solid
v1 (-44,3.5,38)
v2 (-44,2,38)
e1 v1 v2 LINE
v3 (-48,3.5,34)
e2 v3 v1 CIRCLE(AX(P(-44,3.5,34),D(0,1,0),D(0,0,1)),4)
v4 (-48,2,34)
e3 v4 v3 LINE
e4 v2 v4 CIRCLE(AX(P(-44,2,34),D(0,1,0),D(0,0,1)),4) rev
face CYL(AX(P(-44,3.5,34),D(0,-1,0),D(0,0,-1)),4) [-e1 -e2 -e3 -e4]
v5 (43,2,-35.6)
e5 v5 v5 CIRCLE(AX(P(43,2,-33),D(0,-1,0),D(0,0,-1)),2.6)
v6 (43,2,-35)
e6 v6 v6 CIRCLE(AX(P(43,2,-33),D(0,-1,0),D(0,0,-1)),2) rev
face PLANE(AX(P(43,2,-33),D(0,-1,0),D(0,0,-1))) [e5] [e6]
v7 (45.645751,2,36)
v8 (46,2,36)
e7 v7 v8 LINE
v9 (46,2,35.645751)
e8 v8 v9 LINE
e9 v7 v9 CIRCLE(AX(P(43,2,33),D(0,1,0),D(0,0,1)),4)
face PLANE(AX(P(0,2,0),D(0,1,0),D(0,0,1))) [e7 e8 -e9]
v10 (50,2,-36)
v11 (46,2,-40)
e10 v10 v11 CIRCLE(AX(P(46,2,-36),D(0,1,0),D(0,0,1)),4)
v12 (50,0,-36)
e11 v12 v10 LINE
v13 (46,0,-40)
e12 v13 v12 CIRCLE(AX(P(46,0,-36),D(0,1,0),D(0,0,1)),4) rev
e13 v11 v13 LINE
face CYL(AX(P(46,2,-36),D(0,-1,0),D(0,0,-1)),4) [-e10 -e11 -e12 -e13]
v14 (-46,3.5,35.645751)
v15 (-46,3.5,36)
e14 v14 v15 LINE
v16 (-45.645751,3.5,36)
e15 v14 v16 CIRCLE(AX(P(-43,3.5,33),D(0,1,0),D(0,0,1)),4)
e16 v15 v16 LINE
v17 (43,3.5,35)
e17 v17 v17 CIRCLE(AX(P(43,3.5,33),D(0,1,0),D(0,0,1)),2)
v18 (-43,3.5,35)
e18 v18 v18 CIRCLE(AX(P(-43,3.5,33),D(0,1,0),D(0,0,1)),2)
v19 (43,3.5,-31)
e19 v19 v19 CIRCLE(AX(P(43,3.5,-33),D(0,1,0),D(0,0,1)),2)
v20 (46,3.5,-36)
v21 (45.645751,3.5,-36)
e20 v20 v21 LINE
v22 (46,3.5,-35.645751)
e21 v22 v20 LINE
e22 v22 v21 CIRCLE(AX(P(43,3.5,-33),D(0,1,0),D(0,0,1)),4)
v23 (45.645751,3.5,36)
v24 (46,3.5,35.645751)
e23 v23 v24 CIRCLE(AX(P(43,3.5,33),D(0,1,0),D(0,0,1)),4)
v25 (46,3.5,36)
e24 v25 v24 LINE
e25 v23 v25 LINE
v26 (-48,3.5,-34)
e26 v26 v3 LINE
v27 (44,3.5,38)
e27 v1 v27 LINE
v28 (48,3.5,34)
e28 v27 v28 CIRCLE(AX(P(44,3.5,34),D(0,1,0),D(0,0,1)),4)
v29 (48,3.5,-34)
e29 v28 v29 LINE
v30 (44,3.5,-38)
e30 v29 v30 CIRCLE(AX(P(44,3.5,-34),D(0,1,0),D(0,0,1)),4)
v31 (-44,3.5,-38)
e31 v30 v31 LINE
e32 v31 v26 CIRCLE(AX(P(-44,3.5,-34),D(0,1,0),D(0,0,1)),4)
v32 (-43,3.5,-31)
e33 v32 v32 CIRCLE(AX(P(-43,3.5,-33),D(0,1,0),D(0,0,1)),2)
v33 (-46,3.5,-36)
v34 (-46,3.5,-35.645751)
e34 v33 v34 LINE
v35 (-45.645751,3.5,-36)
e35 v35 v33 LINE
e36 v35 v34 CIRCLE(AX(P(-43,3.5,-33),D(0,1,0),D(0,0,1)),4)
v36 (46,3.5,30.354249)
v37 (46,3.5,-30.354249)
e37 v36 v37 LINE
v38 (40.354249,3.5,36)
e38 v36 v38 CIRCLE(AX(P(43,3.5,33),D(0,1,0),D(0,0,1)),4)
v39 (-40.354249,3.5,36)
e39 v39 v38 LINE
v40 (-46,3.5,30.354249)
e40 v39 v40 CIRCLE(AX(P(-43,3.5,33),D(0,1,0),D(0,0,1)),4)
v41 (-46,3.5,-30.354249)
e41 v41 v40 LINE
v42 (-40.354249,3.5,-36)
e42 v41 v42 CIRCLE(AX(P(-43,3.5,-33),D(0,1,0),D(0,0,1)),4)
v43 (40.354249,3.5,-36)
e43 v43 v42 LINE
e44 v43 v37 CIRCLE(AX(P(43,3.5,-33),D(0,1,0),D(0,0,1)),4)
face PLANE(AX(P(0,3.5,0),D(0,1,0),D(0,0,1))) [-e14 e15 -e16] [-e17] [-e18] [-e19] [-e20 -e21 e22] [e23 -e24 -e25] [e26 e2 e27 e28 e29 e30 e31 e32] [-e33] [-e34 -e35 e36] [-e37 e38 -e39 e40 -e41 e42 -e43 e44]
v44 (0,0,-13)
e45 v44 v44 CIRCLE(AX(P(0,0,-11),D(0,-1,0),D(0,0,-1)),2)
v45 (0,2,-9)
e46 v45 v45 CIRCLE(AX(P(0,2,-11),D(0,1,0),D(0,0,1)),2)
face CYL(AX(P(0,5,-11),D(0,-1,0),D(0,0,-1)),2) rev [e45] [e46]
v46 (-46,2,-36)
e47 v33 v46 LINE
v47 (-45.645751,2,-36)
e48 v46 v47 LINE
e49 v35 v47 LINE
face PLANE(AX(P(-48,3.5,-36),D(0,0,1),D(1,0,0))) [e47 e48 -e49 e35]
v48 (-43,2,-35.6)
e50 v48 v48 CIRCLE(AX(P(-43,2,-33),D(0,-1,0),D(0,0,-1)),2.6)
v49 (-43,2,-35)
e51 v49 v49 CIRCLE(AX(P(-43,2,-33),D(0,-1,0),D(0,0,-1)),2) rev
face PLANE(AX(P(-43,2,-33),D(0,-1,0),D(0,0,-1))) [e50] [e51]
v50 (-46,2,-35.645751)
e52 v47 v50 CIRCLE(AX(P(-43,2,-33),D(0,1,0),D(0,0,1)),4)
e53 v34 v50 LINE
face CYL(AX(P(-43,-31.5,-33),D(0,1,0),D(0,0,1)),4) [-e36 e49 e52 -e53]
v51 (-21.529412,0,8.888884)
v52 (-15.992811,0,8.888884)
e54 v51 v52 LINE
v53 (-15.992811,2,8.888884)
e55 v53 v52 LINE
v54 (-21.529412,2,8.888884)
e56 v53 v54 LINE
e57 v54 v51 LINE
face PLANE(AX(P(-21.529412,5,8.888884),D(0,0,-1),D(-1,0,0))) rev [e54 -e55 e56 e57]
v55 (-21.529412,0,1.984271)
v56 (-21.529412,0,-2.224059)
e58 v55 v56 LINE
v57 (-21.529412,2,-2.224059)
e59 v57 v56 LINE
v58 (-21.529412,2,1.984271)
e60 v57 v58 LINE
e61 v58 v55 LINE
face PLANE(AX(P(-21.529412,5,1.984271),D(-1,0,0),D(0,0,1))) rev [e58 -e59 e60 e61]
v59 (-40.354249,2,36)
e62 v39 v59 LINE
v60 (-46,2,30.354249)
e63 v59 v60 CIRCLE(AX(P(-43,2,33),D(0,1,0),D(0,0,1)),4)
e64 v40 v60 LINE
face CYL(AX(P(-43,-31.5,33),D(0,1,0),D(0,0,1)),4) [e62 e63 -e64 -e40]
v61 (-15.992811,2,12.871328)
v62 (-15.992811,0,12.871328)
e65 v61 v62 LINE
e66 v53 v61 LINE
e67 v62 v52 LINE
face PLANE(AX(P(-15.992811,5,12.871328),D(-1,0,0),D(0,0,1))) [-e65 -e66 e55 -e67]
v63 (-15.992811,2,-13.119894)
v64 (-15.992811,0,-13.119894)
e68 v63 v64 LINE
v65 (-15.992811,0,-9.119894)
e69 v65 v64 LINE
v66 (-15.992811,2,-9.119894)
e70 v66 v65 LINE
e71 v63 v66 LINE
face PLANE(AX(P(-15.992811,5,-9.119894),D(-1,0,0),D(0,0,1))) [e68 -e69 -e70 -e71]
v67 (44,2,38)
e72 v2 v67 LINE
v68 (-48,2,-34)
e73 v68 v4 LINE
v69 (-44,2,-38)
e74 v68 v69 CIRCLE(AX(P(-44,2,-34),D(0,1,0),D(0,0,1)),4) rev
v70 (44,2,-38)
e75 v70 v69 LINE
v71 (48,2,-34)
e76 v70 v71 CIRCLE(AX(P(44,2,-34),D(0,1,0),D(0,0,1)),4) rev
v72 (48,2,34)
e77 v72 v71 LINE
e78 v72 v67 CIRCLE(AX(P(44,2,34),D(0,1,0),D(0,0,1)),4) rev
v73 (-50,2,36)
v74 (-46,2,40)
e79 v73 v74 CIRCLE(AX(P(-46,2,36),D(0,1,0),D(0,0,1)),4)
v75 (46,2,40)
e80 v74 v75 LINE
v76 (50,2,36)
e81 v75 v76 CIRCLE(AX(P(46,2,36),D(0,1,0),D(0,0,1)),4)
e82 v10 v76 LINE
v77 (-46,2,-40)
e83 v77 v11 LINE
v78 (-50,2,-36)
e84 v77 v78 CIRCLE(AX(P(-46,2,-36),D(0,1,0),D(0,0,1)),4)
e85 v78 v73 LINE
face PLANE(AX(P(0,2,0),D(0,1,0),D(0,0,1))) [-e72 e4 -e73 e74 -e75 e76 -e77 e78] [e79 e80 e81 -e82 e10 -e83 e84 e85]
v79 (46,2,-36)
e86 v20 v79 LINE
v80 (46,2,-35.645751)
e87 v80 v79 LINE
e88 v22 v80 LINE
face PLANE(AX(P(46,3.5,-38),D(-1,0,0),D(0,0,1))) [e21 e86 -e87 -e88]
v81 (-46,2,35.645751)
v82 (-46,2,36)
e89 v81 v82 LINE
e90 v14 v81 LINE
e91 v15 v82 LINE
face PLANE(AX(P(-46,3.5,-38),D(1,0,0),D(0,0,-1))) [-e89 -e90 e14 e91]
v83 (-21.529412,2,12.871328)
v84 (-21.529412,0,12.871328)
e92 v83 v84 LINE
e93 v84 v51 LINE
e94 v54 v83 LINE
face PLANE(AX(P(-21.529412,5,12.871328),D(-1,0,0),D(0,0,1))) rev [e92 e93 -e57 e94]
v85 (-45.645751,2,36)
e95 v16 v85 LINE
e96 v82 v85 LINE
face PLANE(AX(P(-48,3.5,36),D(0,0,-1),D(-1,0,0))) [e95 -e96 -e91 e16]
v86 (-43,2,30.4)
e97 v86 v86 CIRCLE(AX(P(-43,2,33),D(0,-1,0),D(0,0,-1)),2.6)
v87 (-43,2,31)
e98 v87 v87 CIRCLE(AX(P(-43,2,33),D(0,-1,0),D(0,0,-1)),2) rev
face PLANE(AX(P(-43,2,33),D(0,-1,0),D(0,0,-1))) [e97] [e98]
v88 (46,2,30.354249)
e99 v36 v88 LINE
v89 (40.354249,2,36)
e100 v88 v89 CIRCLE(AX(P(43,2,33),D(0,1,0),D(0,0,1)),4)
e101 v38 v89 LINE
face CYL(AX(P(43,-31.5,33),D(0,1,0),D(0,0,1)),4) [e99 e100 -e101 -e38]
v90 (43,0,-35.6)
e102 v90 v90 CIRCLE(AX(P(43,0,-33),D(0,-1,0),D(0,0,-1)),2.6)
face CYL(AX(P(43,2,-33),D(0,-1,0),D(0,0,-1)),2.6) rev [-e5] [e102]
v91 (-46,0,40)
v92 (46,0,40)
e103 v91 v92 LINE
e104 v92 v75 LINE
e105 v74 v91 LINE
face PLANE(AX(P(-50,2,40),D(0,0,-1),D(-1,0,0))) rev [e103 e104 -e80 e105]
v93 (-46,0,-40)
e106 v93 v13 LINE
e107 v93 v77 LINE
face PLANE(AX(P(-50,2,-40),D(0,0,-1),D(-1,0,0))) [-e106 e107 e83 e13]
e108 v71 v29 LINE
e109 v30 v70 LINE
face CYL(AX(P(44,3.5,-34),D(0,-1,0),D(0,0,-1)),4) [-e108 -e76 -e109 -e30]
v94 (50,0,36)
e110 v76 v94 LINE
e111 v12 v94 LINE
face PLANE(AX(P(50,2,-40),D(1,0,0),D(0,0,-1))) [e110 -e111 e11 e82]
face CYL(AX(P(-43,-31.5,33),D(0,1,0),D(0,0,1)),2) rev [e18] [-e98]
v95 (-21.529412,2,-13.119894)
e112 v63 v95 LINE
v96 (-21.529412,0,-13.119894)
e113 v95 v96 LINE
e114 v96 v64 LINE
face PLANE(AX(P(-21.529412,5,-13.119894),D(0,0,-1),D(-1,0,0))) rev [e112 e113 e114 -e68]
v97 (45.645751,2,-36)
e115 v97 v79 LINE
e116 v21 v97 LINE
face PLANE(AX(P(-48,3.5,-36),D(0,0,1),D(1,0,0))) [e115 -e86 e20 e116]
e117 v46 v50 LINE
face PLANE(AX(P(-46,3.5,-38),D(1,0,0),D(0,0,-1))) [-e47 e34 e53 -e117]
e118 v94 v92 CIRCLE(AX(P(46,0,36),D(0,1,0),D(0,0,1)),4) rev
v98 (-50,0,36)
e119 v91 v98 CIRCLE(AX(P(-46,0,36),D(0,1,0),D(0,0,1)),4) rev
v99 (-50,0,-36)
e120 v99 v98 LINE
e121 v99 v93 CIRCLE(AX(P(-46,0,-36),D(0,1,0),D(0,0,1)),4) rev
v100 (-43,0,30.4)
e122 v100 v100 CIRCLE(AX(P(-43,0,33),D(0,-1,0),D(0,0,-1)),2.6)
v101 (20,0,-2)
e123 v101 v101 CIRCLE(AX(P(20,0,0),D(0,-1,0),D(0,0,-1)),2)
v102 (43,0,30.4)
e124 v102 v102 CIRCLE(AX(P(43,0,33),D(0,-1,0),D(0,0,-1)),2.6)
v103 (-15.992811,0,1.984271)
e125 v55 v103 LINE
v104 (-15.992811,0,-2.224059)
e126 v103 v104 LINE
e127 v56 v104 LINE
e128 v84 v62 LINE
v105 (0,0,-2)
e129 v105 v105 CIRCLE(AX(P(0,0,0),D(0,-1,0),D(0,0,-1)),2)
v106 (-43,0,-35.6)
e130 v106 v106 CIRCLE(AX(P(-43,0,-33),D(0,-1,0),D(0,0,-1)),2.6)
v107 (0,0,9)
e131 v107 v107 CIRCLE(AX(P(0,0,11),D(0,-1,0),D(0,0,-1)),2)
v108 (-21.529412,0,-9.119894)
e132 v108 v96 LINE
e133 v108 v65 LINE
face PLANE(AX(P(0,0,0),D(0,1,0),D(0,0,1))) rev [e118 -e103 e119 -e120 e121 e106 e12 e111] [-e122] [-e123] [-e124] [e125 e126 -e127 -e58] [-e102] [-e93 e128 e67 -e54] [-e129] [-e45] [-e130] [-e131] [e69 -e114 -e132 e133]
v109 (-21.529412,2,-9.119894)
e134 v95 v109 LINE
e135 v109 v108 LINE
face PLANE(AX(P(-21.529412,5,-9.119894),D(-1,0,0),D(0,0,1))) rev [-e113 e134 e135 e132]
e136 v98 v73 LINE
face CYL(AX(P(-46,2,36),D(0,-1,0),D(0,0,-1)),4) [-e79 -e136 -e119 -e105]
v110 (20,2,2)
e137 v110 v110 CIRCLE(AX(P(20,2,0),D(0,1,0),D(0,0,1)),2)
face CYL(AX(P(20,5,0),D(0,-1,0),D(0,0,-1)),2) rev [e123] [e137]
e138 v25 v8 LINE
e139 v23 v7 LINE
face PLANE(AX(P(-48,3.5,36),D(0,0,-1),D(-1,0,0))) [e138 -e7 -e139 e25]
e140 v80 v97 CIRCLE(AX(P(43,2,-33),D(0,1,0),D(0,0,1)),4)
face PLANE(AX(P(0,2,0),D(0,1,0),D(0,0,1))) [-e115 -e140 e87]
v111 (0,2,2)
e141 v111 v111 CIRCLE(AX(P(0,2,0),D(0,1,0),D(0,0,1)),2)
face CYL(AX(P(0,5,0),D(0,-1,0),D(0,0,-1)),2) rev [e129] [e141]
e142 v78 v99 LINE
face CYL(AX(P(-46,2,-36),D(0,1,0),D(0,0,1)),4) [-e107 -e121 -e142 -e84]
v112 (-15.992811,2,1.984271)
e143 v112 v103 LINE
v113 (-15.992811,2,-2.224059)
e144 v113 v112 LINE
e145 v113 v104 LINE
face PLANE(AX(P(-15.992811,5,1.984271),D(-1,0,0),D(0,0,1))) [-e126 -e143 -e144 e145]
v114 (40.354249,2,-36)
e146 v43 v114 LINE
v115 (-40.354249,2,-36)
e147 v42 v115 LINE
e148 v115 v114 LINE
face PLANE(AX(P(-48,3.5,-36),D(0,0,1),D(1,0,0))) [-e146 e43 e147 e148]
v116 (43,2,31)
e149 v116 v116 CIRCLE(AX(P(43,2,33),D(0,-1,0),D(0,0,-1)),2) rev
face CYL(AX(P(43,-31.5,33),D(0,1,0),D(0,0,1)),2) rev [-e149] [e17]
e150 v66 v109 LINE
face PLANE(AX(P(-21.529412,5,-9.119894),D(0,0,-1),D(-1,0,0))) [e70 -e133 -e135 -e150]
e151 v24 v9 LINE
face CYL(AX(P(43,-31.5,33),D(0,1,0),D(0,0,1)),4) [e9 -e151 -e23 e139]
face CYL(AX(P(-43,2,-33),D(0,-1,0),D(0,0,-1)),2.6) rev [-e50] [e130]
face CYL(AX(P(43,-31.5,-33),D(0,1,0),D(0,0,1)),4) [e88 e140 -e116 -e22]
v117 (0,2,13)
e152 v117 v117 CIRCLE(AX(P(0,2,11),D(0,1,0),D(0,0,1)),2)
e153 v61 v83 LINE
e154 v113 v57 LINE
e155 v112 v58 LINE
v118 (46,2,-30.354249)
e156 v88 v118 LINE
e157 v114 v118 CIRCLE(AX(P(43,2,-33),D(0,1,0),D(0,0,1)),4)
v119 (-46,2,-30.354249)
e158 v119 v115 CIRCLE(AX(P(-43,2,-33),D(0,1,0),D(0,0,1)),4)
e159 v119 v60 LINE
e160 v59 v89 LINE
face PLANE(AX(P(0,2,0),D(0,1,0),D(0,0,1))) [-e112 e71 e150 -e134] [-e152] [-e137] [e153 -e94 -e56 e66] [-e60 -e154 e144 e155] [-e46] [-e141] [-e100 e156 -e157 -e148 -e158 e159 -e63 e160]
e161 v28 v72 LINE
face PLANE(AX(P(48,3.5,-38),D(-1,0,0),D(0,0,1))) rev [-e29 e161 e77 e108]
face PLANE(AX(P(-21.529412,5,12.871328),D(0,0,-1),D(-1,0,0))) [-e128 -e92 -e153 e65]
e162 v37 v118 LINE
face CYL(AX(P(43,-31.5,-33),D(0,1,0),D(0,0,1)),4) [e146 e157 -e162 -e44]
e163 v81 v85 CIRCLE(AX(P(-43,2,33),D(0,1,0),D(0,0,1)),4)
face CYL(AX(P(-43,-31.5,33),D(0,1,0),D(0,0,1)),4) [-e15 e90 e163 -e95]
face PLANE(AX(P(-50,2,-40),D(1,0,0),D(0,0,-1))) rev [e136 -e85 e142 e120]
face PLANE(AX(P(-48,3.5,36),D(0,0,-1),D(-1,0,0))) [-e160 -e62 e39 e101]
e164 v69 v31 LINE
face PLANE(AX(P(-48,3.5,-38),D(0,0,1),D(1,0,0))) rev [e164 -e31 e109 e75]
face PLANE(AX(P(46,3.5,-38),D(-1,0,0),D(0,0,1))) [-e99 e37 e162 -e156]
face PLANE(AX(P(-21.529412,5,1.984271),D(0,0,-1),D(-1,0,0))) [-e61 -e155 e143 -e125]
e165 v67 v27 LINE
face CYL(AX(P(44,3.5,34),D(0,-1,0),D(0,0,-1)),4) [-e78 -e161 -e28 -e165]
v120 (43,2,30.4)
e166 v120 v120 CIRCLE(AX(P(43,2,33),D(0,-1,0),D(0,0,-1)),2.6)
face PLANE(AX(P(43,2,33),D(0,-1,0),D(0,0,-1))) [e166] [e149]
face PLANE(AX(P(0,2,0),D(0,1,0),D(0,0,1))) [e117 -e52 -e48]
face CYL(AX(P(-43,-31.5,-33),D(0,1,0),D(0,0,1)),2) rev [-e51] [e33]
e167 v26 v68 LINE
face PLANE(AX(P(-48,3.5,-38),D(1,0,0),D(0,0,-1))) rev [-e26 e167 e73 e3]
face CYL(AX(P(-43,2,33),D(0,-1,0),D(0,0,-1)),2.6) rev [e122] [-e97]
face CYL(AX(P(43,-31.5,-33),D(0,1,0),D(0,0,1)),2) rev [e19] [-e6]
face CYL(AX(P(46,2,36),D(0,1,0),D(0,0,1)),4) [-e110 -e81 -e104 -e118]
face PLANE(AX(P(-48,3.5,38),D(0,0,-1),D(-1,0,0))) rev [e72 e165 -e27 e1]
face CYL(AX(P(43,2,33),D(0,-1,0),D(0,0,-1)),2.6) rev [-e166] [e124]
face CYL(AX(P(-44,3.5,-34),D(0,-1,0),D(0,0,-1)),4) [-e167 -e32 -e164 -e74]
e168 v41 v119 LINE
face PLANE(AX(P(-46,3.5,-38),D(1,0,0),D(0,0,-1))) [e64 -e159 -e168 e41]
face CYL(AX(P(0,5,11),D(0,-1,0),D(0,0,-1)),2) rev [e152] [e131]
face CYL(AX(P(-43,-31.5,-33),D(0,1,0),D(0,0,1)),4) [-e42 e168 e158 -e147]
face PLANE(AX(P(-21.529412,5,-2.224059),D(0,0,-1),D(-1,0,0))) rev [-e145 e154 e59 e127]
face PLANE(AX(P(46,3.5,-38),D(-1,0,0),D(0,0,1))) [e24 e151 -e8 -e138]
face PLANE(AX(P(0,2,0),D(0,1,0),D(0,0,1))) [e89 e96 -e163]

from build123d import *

# Parameters (mm, degrees)
SKETCH1_W           = 100
SKETCH1_H           = 80
BOSS_EXTRUDE2_DEPTH = 2
SKETCH3_W           = 96
SKETCH3_H           = 76
BOSS_EXTRUDE3_DEPTH = 1.5
SKETCH5_R           = 2
CUT_EXTRUDE1_DEPTH  = 35
SHELL1_START        = 2
SHELL1_DEPTH        = 1.5
FILLET1_R           = 4
FILLET2_R           = 4
FILLET3_R           = 4
SKETCH10_R          = 2
SKETCH10_W          = 5.536600299
SKETCH10_H          = 4
SKETCH10_H_2        = 4.208329991
SKETCH10_H_3        = 3.982444476
CUT_EXTRUDE2_DEPTH  = 5
SKETCH11_R          = 2.6
CUT_EXTRUDE3_DEPTH  = 2


# Read off the part's stored shape, not the designer's step: Shell1
with BuildPart() as part:
    # Sketch1 → Boss-Extrude2 (new body)
    with BuildSketch(Plane(origin=(0, 0, 0), x_dir=(1, 0, 0), z_dir=(0, 1, 0))):
        Rectangle(SKETCH1_W, SKETCH1_H)
    extrude(amount=BOSS_EXTRUDE2_DEPTH)

    # Sketch3 → Boss-Extrude3 (add)
    with BuildSketch(Plane(origin=(0, 2, 0), x_dir=(1, 0, 0), z_dir=(0, 1, 0))):
        Rectangle(SKETCH3_W, SKETCH3_H)
    extrude(amount=BOSS_EXTRUDE3_DEPTH)

    # Sketch5 → Cut-Extrude1 (cut)
    with BuildSketch(Plane(origin=(0, 3.5, 0), x_dir=(1, 0, 0), z_dir=(0, 1, 0))):
        with Locations(Location((-43, -33, 0), (0, 0, 270))):
            Circle(SKETCH5_R)
        with Locations(Location((-43, 33, 0), (0, 0, 270))):
            Circle(SKETCH5_R)
        with Locations(Location((43, -33, 0), (0, 0, 270))):
            Circle(SKETCH5_R)
        with Locations(Location((43, 33, 0), (0, 0, 270))):
            Circle(SKETCH5_R)
    extrude(amount=-CUT_EXTRUDE1_DEPTH, mode=Mode.SUBTRACT)

    # Shell1 outline → Shell1 (cut)
    with BuildSketch(Plane(origin=(0, 0, 0), x_dir=(1, 0, 0), z_dir=(0, 1, 0)).offset(SHELL1_START)):
        with BuildLine():
            ThreePointArc((-46, 35.645751311), (-45.828427125, 35.828427125), (-45.645751311, 36))
            Line((-45.645751311, 36), (-46, 36))
            Line((-46, 36), (-46, 35.645751311))
        make_face()
        with BuildLine():
            ThreePointArc((-40.354248689, 36), (-40.171572875, 30.171572875), (-46, 30.354248689))
            Line((-46, 30.354248689), (-46, -30.354248689))
            ThreePointArc((-46, -30.354248689), (-40.171572875, -30.171572875), (-40.354248689, -36))
            Line((-40.354248689, -36), (40.354248689, -36))
            ThreePointArc((40.354248689, -36), (40.171572875, -30.171572875), (46, -30.354248689))
            Line((46, -30.354248689), (46, 30.354248689))
            ThreePointArc((46, 30.354248689), (40.171572875, 30.171572875), (40.354248689, 36))
            Line((40.354248689, 36), (-40.354248689, 36))
        make_face()
        with BuildLine():
            Line((46, 36), (45.645751311, 36))
            ThreePointArc((45.645751311, 36), (45.828427125, 35.828427125), (46, 35.645751311))
            Line((46, 35.645751311), (46, 36))
        make_face()
        with BuildLine():
            Line((-46, -35.645751311), (-46, -36))
            Line((-46, -36), (-45.645751311, -36))
            ThreePointArc((-45.645751311, -36), (-45.828427125, -35.828427125), (-46, -35.645751311))
        make_face()
        with BuildLine():
            ThreePointArc((46, -35.645751311), (45.828427125, -35.828427125), (45.645751311, -36))
            Line((45.645751311, -36), (46, -36))
            Line((46, -36), (46, -35.645751311))
        make_face()
    extrude(amount=SHELL1_DEPTH, mode=Mode.SUBTRACT)

    # Fillet1
    fillet1_edges = [part.edges().sort_by_distance(p)[0] for p in [
        (-48, 2.75, 38),
    ]]
    fillet(fillet1_edges, radius=FILLET1_R)

    # Fillet2
    fillet2_edges = [part.edges().sort_by_distance(p)[0] for p in [
        (48, 2.75, 38),
        (48, 2.75, -38),
        (-48, 2.75, -38),
    ]]
    fillet(fillet2_edges, radius=FILLET2_R)

    # Fillet3
    fillet3_edges = [part.edges().sort_by_distance(p)[0] for p in [
        (-50, 1, -40),
        (50, 1, -40),
        (50, 1, 40),
        (-50, 1, 40),
    ]]
    fillet(fillet3_edges, radius=FILLET3_R)

    # Sketch10 → Cut-Extrude2 (cut)
    with BuildSketch(Plane.XZ):
        with Locations(Location((0, -11, 0), (0, 0, 270))):
            Circle(SKETCH10_R)
        with Locations(Location((0, 0, 0), (0, 0, 270))):
            Circle(SKETCH10_R)
        with Locations(Location((0, 11, 0), (0, 0, 270))):
            Circle(SKETCH10_R)
        with Locations(Location((20, 0, 0), (0, 0, 270))):
            Circle(SKETCH10_R)
        with Locations((-18.761111615, -11.119893759)):
            Rectangle(SKETCH10_W, SKETCH10_H)
        with Locations((-18.761111615, -0.119893758)):
            Rectangle(SKETCH10_W, SKETCH10_H_2)
        with Locations((-18.761111615, 10.880106241)):
            Rectangle(SKETCH10_W, SKETCH10_H_3)
    extrude(amount=-CUT_EXTRUDE2_DEPTH, mode=Mode.SUBTRACT)

    # Sketch11 → Cut-Extrude3 (cut)
    with BuildSketch(Plane.XZ):
        with Locations(Location((43, 33, 0), (0, 0, 270))):
            Circle(SKETCH11_R)
        with Locations(Location((43, -33, 0), (0, 0, 270))):
            Circle(SKETCH11_R)
        with Locations(Location((-43, -33, 0), (0, 0, 270))):
            Circle(SKETCH11_R)
        with Locations(Location((-43, 33, 0), (0, 0, 270))):
            Circle(SKETCH11_R)
    extrude(amount=-CUT_EXTRUDE3_DEPTH, mode=Mode.SUBTRACT)


solid = part.part
